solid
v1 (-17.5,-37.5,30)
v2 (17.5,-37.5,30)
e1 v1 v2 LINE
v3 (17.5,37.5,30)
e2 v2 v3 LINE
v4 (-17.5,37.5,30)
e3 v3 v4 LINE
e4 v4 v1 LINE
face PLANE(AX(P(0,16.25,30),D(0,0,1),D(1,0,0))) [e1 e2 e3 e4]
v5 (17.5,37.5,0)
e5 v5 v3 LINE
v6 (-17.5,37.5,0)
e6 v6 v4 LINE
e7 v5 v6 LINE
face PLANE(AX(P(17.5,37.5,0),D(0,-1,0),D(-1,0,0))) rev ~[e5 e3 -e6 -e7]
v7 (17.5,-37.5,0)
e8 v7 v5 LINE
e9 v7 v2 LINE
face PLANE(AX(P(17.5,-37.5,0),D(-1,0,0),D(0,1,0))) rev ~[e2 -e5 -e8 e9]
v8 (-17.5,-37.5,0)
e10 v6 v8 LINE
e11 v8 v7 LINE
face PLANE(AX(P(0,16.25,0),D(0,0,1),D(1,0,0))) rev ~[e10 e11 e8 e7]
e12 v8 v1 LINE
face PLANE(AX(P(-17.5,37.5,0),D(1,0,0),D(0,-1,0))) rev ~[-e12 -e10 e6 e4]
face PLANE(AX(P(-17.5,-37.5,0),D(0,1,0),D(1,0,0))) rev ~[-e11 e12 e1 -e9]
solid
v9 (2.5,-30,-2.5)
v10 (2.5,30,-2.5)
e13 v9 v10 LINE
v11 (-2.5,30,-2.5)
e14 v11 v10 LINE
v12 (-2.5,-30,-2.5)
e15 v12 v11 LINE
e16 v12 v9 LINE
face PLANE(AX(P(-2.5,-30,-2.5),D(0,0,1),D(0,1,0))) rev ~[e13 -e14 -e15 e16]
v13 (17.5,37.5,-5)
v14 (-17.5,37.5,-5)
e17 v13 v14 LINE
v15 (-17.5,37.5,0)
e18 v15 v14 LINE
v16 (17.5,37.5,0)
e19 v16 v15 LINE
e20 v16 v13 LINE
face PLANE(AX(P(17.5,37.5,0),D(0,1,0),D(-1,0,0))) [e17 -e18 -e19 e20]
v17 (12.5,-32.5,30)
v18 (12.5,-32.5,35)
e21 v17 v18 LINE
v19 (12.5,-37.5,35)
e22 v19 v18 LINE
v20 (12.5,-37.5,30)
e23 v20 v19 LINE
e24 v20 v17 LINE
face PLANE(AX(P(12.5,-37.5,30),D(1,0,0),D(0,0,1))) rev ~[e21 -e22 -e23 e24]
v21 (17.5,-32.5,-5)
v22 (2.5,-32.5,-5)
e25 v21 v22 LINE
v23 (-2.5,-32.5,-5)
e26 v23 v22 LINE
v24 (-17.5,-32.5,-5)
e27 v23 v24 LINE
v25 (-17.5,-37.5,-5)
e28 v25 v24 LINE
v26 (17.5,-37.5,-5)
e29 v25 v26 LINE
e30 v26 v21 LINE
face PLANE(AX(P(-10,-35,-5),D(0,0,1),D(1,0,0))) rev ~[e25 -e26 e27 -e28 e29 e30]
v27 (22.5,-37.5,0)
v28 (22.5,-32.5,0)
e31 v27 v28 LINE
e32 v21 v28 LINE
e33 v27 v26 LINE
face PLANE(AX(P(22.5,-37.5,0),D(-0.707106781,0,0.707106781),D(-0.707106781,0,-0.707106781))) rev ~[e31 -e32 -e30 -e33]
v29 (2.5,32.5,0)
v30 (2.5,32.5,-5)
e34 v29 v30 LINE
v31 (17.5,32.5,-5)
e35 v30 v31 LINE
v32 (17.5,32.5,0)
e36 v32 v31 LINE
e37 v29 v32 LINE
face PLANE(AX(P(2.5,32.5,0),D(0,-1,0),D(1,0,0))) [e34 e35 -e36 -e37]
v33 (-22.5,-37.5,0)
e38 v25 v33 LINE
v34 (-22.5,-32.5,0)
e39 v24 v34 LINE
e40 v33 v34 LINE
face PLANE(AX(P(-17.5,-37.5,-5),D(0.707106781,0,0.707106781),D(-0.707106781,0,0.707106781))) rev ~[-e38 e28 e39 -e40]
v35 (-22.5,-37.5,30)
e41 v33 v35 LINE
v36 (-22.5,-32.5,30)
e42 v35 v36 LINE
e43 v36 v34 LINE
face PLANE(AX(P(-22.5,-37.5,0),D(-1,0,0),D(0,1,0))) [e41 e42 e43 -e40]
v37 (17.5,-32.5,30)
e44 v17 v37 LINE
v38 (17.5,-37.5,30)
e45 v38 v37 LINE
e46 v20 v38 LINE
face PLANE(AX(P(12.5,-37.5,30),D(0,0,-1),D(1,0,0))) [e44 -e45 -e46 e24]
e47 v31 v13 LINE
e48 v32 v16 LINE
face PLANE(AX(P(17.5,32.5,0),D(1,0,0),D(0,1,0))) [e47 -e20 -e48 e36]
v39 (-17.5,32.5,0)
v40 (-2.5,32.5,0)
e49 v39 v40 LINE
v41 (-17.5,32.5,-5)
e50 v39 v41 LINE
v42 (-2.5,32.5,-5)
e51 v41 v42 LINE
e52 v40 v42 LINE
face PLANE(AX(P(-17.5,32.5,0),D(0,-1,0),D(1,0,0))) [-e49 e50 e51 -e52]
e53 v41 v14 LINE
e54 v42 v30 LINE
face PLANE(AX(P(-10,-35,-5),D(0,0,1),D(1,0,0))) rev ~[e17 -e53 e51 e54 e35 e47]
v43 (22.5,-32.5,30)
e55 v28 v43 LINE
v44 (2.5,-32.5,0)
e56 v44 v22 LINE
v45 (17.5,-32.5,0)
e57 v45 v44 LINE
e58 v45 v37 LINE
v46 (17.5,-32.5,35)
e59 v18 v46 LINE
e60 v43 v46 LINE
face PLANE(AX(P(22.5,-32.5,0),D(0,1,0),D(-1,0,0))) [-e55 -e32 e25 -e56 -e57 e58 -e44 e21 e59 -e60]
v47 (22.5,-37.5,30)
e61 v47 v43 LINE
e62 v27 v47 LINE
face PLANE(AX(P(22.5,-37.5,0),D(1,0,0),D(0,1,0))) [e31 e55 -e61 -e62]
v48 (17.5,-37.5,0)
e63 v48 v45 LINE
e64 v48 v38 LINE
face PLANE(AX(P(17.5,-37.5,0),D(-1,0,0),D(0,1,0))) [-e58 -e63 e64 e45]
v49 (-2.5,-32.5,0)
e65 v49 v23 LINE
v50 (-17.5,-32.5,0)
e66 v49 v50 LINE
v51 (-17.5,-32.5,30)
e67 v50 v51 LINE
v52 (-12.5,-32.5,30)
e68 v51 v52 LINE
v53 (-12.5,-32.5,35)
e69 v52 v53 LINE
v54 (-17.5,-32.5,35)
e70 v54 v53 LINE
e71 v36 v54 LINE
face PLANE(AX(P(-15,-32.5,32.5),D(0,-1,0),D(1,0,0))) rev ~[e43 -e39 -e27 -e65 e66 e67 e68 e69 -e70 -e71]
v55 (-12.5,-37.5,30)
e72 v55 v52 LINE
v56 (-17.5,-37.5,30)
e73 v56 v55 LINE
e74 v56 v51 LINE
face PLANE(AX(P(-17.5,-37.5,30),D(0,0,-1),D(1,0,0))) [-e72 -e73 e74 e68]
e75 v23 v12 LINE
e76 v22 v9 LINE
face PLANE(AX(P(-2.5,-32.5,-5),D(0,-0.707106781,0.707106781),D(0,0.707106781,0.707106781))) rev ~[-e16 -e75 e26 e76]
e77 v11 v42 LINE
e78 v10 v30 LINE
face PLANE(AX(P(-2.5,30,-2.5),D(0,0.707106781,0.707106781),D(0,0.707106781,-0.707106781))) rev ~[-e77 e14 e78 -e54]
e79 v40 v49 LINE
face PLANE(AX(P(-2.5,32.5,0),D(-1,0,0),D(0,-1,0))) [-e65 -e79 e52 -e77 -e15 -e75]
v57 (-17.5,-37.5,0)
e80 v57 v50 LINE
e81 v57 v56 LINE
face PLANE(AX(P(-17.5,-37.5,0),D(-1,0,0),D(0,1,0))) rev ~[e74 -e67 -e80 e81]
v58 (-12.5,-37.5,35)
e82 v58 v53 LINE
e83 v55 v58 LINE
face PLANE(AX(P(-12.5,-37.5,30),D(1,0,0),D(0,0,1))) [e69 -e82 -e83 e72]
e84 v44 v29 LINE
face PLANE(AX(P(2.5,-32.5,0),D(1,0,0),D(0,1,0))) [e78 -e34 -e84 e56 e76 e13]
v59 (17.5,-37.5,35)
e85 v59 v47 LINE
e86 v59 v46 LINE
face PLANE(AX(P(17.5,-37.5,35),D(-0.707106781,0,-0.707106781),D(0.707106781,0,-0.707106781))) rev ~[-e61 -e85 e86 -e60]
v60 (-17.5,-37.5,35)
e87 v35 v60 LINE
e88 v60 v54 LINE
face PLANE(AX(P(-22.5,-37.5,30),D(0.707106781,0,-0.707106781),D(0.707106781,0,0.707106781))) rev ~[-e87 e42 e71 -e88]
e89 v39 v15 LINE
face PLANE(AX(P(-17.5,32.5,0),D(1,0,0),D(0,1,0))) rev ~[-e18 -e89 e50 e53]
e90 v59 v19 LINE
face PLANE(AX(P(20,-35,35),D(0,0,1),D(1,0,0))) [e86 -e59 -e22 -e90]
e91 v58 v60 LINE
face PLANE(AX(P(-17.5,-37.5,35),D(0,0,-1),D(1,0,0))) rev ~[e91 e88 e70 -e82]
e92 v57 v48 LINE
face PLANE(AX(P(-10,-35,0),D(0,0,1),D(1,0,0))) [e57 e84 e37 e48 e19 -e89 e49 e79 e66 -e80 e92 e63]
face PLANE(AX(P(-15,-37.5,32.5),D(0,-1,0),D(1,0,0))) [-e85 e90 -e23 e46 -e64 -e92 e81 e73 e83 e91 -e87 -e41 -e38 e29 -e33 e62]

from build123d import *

# Parameters (mm, degrees)
F0_W     = 15
F0_H     = 32.5
F0_H_2   = 5
F0_W_2   = 5
F1_DEPTH = 30
F2_DEPTH = 5
F3_DEPTH = 35
F4_W     = 5
F4_H     = 5
F5_DEPTH = 5
F7_DEPTH = 5
F9_DEPTH = 75


# Not quite as in the source:
# - a feature names something its author has since deleted; it is built from what else it names


with BuildPart() as f1:
    # F0 (on Top) → F1 (new body)
    with BuildSketch(Plane.XY):
        Polygon((-2.5, 0), (0, 0), (2.5, 0), (2.5, 32.5), (-2.5, 32.5), align=None)
        with Locations((-10, 16.25)):
            Rectangle(F0_W, F0_H)
        Polygon((2.5, 0), (0, 0), (-2.5, 0), (-2.5, -32.5), (2.5, -32.5), align=None)
        with Locations((-10, -16.25)):
            Rectangle(F0_W, F0_H)
        with Locations((10, 16.25)):
            Rectangle(F0_W, F0_H)
        with Locations((10, -16.25)):
            Rectangle(F0_W, F0_H)
        Polygon((-2.5, 32.5), (2.5, 32.5), (2.5, 37.5), (0, 37.5), (-2.5, 37.5), align=None)
        with Locations((10, 35)):
            Rectangle(F0_W, F0_H_2)
        with Locations((-10, 35)):
            Rectangle(F0_W, F0_H_2)
        with Locations((10, -35)):
            Rectangle(F0_W, F0_H_2)
        with Locations((-10, -35)):
            Rectangle(F0_W, F0_H_2)
        with Locations((0, -35)):
            Rectangle(F0_W_2, F0_H_2)
    extrude(amount=F1_DEPTH)


with BuildPart() as f2:
    # F0 (on Top) → F2 (new body)
    with BuildSketch(Plane.XY):
        with Locations((-10, -35)):
            Rectangle(F0_W, F0_H_2)
        with Locations((-10, 35)):
            Rectangle(F0_W, F0_H_2)
        with Locations((10, -35)):
            Rectangle(F0_W, F0_H_2)
        Polygon((-2.5, 0), (0, 0), (2.5, 0), (2.5, 32.5), (-2.5, 32.5), align=None)
        with Locations((10, 35)):
            Rectangle(F0_W, F0_H_2)
        Polygon((-2.5, 32.5), (2.5, 32.5), (2.5, 37.5), (0, 37.5), (-2.5, 37.5), align=None)
        Polygon((2.5, 0), (0, 0), (-2.5, 0), (-2.5, -32.5), (2.5, -32.5), align=None)
        with Locations((0, -35)):
            Rectangle(F0_W_2, F0_H_2)
        with Locations((20, -35)):
            Rectangle(F0_W_2, F0_H_2)
        with Locations((-20, -35)):
            Rectangle(F0_W_2, F0_H_2)
    extrude(amount=-F2_DEPTH)

    # F0 (on Top) → F3 (join)
    with BuildSketch(Plane.XY):
        with Locations((-20, -35)):
            Rectangle(F0_W_2, F0_H_2)
        with Locations((20, -35)):
            Rectangle(F0_W_2, F0_H_2)
    extrude(amount=F3_DEPTH)

    # F4 (on face) → F5 (join)
    with BuildSketch(Plane.XZ.offset(37.5)):
        with Locations((-15, 32.5)):
            Rectangle(F4_W, F4_H)
        with Locations((15, 32.5)):
            Rectangle(F4_W, F4_H)
    extrude(amount=-F5_DEPTH)

    # F6 (on face) → F7 (cut)
    with BuildSketch(Plane(origin=(-2.5, 0, 0), x_dir=(0, -1, 0), z_dir=(-1, 0, 0))):
        Polygon((-30, -2.5), (-32.5, -5), (32.5, -5), (30, -2.5), align=None)
    extrude(amount=-F7_DEPTH, mode=Mode.SUBTRACT)

    # F8 (on face) → F9 (cut)
    with BuildSketch(Plane.XZ.offset(37.5)):
        Polygon((-22.5, 35), (-22.5, 30), (-17.5, 35), align=None)
        Polygon((17.5, 35), (22.5, 30), (22.5, 35), align=None)
        Polygon((-17.5, -5), (-22.5, 0), (-22.5, -5), align=None)
        Polygon((22.5, 0), (17.5, -5), (22.5, -5), align=None)
    extrude(amount=-F9_DEPTH, mode=Mode.SUBTRACT)


solid = Compound([f1.part, f2.part])
